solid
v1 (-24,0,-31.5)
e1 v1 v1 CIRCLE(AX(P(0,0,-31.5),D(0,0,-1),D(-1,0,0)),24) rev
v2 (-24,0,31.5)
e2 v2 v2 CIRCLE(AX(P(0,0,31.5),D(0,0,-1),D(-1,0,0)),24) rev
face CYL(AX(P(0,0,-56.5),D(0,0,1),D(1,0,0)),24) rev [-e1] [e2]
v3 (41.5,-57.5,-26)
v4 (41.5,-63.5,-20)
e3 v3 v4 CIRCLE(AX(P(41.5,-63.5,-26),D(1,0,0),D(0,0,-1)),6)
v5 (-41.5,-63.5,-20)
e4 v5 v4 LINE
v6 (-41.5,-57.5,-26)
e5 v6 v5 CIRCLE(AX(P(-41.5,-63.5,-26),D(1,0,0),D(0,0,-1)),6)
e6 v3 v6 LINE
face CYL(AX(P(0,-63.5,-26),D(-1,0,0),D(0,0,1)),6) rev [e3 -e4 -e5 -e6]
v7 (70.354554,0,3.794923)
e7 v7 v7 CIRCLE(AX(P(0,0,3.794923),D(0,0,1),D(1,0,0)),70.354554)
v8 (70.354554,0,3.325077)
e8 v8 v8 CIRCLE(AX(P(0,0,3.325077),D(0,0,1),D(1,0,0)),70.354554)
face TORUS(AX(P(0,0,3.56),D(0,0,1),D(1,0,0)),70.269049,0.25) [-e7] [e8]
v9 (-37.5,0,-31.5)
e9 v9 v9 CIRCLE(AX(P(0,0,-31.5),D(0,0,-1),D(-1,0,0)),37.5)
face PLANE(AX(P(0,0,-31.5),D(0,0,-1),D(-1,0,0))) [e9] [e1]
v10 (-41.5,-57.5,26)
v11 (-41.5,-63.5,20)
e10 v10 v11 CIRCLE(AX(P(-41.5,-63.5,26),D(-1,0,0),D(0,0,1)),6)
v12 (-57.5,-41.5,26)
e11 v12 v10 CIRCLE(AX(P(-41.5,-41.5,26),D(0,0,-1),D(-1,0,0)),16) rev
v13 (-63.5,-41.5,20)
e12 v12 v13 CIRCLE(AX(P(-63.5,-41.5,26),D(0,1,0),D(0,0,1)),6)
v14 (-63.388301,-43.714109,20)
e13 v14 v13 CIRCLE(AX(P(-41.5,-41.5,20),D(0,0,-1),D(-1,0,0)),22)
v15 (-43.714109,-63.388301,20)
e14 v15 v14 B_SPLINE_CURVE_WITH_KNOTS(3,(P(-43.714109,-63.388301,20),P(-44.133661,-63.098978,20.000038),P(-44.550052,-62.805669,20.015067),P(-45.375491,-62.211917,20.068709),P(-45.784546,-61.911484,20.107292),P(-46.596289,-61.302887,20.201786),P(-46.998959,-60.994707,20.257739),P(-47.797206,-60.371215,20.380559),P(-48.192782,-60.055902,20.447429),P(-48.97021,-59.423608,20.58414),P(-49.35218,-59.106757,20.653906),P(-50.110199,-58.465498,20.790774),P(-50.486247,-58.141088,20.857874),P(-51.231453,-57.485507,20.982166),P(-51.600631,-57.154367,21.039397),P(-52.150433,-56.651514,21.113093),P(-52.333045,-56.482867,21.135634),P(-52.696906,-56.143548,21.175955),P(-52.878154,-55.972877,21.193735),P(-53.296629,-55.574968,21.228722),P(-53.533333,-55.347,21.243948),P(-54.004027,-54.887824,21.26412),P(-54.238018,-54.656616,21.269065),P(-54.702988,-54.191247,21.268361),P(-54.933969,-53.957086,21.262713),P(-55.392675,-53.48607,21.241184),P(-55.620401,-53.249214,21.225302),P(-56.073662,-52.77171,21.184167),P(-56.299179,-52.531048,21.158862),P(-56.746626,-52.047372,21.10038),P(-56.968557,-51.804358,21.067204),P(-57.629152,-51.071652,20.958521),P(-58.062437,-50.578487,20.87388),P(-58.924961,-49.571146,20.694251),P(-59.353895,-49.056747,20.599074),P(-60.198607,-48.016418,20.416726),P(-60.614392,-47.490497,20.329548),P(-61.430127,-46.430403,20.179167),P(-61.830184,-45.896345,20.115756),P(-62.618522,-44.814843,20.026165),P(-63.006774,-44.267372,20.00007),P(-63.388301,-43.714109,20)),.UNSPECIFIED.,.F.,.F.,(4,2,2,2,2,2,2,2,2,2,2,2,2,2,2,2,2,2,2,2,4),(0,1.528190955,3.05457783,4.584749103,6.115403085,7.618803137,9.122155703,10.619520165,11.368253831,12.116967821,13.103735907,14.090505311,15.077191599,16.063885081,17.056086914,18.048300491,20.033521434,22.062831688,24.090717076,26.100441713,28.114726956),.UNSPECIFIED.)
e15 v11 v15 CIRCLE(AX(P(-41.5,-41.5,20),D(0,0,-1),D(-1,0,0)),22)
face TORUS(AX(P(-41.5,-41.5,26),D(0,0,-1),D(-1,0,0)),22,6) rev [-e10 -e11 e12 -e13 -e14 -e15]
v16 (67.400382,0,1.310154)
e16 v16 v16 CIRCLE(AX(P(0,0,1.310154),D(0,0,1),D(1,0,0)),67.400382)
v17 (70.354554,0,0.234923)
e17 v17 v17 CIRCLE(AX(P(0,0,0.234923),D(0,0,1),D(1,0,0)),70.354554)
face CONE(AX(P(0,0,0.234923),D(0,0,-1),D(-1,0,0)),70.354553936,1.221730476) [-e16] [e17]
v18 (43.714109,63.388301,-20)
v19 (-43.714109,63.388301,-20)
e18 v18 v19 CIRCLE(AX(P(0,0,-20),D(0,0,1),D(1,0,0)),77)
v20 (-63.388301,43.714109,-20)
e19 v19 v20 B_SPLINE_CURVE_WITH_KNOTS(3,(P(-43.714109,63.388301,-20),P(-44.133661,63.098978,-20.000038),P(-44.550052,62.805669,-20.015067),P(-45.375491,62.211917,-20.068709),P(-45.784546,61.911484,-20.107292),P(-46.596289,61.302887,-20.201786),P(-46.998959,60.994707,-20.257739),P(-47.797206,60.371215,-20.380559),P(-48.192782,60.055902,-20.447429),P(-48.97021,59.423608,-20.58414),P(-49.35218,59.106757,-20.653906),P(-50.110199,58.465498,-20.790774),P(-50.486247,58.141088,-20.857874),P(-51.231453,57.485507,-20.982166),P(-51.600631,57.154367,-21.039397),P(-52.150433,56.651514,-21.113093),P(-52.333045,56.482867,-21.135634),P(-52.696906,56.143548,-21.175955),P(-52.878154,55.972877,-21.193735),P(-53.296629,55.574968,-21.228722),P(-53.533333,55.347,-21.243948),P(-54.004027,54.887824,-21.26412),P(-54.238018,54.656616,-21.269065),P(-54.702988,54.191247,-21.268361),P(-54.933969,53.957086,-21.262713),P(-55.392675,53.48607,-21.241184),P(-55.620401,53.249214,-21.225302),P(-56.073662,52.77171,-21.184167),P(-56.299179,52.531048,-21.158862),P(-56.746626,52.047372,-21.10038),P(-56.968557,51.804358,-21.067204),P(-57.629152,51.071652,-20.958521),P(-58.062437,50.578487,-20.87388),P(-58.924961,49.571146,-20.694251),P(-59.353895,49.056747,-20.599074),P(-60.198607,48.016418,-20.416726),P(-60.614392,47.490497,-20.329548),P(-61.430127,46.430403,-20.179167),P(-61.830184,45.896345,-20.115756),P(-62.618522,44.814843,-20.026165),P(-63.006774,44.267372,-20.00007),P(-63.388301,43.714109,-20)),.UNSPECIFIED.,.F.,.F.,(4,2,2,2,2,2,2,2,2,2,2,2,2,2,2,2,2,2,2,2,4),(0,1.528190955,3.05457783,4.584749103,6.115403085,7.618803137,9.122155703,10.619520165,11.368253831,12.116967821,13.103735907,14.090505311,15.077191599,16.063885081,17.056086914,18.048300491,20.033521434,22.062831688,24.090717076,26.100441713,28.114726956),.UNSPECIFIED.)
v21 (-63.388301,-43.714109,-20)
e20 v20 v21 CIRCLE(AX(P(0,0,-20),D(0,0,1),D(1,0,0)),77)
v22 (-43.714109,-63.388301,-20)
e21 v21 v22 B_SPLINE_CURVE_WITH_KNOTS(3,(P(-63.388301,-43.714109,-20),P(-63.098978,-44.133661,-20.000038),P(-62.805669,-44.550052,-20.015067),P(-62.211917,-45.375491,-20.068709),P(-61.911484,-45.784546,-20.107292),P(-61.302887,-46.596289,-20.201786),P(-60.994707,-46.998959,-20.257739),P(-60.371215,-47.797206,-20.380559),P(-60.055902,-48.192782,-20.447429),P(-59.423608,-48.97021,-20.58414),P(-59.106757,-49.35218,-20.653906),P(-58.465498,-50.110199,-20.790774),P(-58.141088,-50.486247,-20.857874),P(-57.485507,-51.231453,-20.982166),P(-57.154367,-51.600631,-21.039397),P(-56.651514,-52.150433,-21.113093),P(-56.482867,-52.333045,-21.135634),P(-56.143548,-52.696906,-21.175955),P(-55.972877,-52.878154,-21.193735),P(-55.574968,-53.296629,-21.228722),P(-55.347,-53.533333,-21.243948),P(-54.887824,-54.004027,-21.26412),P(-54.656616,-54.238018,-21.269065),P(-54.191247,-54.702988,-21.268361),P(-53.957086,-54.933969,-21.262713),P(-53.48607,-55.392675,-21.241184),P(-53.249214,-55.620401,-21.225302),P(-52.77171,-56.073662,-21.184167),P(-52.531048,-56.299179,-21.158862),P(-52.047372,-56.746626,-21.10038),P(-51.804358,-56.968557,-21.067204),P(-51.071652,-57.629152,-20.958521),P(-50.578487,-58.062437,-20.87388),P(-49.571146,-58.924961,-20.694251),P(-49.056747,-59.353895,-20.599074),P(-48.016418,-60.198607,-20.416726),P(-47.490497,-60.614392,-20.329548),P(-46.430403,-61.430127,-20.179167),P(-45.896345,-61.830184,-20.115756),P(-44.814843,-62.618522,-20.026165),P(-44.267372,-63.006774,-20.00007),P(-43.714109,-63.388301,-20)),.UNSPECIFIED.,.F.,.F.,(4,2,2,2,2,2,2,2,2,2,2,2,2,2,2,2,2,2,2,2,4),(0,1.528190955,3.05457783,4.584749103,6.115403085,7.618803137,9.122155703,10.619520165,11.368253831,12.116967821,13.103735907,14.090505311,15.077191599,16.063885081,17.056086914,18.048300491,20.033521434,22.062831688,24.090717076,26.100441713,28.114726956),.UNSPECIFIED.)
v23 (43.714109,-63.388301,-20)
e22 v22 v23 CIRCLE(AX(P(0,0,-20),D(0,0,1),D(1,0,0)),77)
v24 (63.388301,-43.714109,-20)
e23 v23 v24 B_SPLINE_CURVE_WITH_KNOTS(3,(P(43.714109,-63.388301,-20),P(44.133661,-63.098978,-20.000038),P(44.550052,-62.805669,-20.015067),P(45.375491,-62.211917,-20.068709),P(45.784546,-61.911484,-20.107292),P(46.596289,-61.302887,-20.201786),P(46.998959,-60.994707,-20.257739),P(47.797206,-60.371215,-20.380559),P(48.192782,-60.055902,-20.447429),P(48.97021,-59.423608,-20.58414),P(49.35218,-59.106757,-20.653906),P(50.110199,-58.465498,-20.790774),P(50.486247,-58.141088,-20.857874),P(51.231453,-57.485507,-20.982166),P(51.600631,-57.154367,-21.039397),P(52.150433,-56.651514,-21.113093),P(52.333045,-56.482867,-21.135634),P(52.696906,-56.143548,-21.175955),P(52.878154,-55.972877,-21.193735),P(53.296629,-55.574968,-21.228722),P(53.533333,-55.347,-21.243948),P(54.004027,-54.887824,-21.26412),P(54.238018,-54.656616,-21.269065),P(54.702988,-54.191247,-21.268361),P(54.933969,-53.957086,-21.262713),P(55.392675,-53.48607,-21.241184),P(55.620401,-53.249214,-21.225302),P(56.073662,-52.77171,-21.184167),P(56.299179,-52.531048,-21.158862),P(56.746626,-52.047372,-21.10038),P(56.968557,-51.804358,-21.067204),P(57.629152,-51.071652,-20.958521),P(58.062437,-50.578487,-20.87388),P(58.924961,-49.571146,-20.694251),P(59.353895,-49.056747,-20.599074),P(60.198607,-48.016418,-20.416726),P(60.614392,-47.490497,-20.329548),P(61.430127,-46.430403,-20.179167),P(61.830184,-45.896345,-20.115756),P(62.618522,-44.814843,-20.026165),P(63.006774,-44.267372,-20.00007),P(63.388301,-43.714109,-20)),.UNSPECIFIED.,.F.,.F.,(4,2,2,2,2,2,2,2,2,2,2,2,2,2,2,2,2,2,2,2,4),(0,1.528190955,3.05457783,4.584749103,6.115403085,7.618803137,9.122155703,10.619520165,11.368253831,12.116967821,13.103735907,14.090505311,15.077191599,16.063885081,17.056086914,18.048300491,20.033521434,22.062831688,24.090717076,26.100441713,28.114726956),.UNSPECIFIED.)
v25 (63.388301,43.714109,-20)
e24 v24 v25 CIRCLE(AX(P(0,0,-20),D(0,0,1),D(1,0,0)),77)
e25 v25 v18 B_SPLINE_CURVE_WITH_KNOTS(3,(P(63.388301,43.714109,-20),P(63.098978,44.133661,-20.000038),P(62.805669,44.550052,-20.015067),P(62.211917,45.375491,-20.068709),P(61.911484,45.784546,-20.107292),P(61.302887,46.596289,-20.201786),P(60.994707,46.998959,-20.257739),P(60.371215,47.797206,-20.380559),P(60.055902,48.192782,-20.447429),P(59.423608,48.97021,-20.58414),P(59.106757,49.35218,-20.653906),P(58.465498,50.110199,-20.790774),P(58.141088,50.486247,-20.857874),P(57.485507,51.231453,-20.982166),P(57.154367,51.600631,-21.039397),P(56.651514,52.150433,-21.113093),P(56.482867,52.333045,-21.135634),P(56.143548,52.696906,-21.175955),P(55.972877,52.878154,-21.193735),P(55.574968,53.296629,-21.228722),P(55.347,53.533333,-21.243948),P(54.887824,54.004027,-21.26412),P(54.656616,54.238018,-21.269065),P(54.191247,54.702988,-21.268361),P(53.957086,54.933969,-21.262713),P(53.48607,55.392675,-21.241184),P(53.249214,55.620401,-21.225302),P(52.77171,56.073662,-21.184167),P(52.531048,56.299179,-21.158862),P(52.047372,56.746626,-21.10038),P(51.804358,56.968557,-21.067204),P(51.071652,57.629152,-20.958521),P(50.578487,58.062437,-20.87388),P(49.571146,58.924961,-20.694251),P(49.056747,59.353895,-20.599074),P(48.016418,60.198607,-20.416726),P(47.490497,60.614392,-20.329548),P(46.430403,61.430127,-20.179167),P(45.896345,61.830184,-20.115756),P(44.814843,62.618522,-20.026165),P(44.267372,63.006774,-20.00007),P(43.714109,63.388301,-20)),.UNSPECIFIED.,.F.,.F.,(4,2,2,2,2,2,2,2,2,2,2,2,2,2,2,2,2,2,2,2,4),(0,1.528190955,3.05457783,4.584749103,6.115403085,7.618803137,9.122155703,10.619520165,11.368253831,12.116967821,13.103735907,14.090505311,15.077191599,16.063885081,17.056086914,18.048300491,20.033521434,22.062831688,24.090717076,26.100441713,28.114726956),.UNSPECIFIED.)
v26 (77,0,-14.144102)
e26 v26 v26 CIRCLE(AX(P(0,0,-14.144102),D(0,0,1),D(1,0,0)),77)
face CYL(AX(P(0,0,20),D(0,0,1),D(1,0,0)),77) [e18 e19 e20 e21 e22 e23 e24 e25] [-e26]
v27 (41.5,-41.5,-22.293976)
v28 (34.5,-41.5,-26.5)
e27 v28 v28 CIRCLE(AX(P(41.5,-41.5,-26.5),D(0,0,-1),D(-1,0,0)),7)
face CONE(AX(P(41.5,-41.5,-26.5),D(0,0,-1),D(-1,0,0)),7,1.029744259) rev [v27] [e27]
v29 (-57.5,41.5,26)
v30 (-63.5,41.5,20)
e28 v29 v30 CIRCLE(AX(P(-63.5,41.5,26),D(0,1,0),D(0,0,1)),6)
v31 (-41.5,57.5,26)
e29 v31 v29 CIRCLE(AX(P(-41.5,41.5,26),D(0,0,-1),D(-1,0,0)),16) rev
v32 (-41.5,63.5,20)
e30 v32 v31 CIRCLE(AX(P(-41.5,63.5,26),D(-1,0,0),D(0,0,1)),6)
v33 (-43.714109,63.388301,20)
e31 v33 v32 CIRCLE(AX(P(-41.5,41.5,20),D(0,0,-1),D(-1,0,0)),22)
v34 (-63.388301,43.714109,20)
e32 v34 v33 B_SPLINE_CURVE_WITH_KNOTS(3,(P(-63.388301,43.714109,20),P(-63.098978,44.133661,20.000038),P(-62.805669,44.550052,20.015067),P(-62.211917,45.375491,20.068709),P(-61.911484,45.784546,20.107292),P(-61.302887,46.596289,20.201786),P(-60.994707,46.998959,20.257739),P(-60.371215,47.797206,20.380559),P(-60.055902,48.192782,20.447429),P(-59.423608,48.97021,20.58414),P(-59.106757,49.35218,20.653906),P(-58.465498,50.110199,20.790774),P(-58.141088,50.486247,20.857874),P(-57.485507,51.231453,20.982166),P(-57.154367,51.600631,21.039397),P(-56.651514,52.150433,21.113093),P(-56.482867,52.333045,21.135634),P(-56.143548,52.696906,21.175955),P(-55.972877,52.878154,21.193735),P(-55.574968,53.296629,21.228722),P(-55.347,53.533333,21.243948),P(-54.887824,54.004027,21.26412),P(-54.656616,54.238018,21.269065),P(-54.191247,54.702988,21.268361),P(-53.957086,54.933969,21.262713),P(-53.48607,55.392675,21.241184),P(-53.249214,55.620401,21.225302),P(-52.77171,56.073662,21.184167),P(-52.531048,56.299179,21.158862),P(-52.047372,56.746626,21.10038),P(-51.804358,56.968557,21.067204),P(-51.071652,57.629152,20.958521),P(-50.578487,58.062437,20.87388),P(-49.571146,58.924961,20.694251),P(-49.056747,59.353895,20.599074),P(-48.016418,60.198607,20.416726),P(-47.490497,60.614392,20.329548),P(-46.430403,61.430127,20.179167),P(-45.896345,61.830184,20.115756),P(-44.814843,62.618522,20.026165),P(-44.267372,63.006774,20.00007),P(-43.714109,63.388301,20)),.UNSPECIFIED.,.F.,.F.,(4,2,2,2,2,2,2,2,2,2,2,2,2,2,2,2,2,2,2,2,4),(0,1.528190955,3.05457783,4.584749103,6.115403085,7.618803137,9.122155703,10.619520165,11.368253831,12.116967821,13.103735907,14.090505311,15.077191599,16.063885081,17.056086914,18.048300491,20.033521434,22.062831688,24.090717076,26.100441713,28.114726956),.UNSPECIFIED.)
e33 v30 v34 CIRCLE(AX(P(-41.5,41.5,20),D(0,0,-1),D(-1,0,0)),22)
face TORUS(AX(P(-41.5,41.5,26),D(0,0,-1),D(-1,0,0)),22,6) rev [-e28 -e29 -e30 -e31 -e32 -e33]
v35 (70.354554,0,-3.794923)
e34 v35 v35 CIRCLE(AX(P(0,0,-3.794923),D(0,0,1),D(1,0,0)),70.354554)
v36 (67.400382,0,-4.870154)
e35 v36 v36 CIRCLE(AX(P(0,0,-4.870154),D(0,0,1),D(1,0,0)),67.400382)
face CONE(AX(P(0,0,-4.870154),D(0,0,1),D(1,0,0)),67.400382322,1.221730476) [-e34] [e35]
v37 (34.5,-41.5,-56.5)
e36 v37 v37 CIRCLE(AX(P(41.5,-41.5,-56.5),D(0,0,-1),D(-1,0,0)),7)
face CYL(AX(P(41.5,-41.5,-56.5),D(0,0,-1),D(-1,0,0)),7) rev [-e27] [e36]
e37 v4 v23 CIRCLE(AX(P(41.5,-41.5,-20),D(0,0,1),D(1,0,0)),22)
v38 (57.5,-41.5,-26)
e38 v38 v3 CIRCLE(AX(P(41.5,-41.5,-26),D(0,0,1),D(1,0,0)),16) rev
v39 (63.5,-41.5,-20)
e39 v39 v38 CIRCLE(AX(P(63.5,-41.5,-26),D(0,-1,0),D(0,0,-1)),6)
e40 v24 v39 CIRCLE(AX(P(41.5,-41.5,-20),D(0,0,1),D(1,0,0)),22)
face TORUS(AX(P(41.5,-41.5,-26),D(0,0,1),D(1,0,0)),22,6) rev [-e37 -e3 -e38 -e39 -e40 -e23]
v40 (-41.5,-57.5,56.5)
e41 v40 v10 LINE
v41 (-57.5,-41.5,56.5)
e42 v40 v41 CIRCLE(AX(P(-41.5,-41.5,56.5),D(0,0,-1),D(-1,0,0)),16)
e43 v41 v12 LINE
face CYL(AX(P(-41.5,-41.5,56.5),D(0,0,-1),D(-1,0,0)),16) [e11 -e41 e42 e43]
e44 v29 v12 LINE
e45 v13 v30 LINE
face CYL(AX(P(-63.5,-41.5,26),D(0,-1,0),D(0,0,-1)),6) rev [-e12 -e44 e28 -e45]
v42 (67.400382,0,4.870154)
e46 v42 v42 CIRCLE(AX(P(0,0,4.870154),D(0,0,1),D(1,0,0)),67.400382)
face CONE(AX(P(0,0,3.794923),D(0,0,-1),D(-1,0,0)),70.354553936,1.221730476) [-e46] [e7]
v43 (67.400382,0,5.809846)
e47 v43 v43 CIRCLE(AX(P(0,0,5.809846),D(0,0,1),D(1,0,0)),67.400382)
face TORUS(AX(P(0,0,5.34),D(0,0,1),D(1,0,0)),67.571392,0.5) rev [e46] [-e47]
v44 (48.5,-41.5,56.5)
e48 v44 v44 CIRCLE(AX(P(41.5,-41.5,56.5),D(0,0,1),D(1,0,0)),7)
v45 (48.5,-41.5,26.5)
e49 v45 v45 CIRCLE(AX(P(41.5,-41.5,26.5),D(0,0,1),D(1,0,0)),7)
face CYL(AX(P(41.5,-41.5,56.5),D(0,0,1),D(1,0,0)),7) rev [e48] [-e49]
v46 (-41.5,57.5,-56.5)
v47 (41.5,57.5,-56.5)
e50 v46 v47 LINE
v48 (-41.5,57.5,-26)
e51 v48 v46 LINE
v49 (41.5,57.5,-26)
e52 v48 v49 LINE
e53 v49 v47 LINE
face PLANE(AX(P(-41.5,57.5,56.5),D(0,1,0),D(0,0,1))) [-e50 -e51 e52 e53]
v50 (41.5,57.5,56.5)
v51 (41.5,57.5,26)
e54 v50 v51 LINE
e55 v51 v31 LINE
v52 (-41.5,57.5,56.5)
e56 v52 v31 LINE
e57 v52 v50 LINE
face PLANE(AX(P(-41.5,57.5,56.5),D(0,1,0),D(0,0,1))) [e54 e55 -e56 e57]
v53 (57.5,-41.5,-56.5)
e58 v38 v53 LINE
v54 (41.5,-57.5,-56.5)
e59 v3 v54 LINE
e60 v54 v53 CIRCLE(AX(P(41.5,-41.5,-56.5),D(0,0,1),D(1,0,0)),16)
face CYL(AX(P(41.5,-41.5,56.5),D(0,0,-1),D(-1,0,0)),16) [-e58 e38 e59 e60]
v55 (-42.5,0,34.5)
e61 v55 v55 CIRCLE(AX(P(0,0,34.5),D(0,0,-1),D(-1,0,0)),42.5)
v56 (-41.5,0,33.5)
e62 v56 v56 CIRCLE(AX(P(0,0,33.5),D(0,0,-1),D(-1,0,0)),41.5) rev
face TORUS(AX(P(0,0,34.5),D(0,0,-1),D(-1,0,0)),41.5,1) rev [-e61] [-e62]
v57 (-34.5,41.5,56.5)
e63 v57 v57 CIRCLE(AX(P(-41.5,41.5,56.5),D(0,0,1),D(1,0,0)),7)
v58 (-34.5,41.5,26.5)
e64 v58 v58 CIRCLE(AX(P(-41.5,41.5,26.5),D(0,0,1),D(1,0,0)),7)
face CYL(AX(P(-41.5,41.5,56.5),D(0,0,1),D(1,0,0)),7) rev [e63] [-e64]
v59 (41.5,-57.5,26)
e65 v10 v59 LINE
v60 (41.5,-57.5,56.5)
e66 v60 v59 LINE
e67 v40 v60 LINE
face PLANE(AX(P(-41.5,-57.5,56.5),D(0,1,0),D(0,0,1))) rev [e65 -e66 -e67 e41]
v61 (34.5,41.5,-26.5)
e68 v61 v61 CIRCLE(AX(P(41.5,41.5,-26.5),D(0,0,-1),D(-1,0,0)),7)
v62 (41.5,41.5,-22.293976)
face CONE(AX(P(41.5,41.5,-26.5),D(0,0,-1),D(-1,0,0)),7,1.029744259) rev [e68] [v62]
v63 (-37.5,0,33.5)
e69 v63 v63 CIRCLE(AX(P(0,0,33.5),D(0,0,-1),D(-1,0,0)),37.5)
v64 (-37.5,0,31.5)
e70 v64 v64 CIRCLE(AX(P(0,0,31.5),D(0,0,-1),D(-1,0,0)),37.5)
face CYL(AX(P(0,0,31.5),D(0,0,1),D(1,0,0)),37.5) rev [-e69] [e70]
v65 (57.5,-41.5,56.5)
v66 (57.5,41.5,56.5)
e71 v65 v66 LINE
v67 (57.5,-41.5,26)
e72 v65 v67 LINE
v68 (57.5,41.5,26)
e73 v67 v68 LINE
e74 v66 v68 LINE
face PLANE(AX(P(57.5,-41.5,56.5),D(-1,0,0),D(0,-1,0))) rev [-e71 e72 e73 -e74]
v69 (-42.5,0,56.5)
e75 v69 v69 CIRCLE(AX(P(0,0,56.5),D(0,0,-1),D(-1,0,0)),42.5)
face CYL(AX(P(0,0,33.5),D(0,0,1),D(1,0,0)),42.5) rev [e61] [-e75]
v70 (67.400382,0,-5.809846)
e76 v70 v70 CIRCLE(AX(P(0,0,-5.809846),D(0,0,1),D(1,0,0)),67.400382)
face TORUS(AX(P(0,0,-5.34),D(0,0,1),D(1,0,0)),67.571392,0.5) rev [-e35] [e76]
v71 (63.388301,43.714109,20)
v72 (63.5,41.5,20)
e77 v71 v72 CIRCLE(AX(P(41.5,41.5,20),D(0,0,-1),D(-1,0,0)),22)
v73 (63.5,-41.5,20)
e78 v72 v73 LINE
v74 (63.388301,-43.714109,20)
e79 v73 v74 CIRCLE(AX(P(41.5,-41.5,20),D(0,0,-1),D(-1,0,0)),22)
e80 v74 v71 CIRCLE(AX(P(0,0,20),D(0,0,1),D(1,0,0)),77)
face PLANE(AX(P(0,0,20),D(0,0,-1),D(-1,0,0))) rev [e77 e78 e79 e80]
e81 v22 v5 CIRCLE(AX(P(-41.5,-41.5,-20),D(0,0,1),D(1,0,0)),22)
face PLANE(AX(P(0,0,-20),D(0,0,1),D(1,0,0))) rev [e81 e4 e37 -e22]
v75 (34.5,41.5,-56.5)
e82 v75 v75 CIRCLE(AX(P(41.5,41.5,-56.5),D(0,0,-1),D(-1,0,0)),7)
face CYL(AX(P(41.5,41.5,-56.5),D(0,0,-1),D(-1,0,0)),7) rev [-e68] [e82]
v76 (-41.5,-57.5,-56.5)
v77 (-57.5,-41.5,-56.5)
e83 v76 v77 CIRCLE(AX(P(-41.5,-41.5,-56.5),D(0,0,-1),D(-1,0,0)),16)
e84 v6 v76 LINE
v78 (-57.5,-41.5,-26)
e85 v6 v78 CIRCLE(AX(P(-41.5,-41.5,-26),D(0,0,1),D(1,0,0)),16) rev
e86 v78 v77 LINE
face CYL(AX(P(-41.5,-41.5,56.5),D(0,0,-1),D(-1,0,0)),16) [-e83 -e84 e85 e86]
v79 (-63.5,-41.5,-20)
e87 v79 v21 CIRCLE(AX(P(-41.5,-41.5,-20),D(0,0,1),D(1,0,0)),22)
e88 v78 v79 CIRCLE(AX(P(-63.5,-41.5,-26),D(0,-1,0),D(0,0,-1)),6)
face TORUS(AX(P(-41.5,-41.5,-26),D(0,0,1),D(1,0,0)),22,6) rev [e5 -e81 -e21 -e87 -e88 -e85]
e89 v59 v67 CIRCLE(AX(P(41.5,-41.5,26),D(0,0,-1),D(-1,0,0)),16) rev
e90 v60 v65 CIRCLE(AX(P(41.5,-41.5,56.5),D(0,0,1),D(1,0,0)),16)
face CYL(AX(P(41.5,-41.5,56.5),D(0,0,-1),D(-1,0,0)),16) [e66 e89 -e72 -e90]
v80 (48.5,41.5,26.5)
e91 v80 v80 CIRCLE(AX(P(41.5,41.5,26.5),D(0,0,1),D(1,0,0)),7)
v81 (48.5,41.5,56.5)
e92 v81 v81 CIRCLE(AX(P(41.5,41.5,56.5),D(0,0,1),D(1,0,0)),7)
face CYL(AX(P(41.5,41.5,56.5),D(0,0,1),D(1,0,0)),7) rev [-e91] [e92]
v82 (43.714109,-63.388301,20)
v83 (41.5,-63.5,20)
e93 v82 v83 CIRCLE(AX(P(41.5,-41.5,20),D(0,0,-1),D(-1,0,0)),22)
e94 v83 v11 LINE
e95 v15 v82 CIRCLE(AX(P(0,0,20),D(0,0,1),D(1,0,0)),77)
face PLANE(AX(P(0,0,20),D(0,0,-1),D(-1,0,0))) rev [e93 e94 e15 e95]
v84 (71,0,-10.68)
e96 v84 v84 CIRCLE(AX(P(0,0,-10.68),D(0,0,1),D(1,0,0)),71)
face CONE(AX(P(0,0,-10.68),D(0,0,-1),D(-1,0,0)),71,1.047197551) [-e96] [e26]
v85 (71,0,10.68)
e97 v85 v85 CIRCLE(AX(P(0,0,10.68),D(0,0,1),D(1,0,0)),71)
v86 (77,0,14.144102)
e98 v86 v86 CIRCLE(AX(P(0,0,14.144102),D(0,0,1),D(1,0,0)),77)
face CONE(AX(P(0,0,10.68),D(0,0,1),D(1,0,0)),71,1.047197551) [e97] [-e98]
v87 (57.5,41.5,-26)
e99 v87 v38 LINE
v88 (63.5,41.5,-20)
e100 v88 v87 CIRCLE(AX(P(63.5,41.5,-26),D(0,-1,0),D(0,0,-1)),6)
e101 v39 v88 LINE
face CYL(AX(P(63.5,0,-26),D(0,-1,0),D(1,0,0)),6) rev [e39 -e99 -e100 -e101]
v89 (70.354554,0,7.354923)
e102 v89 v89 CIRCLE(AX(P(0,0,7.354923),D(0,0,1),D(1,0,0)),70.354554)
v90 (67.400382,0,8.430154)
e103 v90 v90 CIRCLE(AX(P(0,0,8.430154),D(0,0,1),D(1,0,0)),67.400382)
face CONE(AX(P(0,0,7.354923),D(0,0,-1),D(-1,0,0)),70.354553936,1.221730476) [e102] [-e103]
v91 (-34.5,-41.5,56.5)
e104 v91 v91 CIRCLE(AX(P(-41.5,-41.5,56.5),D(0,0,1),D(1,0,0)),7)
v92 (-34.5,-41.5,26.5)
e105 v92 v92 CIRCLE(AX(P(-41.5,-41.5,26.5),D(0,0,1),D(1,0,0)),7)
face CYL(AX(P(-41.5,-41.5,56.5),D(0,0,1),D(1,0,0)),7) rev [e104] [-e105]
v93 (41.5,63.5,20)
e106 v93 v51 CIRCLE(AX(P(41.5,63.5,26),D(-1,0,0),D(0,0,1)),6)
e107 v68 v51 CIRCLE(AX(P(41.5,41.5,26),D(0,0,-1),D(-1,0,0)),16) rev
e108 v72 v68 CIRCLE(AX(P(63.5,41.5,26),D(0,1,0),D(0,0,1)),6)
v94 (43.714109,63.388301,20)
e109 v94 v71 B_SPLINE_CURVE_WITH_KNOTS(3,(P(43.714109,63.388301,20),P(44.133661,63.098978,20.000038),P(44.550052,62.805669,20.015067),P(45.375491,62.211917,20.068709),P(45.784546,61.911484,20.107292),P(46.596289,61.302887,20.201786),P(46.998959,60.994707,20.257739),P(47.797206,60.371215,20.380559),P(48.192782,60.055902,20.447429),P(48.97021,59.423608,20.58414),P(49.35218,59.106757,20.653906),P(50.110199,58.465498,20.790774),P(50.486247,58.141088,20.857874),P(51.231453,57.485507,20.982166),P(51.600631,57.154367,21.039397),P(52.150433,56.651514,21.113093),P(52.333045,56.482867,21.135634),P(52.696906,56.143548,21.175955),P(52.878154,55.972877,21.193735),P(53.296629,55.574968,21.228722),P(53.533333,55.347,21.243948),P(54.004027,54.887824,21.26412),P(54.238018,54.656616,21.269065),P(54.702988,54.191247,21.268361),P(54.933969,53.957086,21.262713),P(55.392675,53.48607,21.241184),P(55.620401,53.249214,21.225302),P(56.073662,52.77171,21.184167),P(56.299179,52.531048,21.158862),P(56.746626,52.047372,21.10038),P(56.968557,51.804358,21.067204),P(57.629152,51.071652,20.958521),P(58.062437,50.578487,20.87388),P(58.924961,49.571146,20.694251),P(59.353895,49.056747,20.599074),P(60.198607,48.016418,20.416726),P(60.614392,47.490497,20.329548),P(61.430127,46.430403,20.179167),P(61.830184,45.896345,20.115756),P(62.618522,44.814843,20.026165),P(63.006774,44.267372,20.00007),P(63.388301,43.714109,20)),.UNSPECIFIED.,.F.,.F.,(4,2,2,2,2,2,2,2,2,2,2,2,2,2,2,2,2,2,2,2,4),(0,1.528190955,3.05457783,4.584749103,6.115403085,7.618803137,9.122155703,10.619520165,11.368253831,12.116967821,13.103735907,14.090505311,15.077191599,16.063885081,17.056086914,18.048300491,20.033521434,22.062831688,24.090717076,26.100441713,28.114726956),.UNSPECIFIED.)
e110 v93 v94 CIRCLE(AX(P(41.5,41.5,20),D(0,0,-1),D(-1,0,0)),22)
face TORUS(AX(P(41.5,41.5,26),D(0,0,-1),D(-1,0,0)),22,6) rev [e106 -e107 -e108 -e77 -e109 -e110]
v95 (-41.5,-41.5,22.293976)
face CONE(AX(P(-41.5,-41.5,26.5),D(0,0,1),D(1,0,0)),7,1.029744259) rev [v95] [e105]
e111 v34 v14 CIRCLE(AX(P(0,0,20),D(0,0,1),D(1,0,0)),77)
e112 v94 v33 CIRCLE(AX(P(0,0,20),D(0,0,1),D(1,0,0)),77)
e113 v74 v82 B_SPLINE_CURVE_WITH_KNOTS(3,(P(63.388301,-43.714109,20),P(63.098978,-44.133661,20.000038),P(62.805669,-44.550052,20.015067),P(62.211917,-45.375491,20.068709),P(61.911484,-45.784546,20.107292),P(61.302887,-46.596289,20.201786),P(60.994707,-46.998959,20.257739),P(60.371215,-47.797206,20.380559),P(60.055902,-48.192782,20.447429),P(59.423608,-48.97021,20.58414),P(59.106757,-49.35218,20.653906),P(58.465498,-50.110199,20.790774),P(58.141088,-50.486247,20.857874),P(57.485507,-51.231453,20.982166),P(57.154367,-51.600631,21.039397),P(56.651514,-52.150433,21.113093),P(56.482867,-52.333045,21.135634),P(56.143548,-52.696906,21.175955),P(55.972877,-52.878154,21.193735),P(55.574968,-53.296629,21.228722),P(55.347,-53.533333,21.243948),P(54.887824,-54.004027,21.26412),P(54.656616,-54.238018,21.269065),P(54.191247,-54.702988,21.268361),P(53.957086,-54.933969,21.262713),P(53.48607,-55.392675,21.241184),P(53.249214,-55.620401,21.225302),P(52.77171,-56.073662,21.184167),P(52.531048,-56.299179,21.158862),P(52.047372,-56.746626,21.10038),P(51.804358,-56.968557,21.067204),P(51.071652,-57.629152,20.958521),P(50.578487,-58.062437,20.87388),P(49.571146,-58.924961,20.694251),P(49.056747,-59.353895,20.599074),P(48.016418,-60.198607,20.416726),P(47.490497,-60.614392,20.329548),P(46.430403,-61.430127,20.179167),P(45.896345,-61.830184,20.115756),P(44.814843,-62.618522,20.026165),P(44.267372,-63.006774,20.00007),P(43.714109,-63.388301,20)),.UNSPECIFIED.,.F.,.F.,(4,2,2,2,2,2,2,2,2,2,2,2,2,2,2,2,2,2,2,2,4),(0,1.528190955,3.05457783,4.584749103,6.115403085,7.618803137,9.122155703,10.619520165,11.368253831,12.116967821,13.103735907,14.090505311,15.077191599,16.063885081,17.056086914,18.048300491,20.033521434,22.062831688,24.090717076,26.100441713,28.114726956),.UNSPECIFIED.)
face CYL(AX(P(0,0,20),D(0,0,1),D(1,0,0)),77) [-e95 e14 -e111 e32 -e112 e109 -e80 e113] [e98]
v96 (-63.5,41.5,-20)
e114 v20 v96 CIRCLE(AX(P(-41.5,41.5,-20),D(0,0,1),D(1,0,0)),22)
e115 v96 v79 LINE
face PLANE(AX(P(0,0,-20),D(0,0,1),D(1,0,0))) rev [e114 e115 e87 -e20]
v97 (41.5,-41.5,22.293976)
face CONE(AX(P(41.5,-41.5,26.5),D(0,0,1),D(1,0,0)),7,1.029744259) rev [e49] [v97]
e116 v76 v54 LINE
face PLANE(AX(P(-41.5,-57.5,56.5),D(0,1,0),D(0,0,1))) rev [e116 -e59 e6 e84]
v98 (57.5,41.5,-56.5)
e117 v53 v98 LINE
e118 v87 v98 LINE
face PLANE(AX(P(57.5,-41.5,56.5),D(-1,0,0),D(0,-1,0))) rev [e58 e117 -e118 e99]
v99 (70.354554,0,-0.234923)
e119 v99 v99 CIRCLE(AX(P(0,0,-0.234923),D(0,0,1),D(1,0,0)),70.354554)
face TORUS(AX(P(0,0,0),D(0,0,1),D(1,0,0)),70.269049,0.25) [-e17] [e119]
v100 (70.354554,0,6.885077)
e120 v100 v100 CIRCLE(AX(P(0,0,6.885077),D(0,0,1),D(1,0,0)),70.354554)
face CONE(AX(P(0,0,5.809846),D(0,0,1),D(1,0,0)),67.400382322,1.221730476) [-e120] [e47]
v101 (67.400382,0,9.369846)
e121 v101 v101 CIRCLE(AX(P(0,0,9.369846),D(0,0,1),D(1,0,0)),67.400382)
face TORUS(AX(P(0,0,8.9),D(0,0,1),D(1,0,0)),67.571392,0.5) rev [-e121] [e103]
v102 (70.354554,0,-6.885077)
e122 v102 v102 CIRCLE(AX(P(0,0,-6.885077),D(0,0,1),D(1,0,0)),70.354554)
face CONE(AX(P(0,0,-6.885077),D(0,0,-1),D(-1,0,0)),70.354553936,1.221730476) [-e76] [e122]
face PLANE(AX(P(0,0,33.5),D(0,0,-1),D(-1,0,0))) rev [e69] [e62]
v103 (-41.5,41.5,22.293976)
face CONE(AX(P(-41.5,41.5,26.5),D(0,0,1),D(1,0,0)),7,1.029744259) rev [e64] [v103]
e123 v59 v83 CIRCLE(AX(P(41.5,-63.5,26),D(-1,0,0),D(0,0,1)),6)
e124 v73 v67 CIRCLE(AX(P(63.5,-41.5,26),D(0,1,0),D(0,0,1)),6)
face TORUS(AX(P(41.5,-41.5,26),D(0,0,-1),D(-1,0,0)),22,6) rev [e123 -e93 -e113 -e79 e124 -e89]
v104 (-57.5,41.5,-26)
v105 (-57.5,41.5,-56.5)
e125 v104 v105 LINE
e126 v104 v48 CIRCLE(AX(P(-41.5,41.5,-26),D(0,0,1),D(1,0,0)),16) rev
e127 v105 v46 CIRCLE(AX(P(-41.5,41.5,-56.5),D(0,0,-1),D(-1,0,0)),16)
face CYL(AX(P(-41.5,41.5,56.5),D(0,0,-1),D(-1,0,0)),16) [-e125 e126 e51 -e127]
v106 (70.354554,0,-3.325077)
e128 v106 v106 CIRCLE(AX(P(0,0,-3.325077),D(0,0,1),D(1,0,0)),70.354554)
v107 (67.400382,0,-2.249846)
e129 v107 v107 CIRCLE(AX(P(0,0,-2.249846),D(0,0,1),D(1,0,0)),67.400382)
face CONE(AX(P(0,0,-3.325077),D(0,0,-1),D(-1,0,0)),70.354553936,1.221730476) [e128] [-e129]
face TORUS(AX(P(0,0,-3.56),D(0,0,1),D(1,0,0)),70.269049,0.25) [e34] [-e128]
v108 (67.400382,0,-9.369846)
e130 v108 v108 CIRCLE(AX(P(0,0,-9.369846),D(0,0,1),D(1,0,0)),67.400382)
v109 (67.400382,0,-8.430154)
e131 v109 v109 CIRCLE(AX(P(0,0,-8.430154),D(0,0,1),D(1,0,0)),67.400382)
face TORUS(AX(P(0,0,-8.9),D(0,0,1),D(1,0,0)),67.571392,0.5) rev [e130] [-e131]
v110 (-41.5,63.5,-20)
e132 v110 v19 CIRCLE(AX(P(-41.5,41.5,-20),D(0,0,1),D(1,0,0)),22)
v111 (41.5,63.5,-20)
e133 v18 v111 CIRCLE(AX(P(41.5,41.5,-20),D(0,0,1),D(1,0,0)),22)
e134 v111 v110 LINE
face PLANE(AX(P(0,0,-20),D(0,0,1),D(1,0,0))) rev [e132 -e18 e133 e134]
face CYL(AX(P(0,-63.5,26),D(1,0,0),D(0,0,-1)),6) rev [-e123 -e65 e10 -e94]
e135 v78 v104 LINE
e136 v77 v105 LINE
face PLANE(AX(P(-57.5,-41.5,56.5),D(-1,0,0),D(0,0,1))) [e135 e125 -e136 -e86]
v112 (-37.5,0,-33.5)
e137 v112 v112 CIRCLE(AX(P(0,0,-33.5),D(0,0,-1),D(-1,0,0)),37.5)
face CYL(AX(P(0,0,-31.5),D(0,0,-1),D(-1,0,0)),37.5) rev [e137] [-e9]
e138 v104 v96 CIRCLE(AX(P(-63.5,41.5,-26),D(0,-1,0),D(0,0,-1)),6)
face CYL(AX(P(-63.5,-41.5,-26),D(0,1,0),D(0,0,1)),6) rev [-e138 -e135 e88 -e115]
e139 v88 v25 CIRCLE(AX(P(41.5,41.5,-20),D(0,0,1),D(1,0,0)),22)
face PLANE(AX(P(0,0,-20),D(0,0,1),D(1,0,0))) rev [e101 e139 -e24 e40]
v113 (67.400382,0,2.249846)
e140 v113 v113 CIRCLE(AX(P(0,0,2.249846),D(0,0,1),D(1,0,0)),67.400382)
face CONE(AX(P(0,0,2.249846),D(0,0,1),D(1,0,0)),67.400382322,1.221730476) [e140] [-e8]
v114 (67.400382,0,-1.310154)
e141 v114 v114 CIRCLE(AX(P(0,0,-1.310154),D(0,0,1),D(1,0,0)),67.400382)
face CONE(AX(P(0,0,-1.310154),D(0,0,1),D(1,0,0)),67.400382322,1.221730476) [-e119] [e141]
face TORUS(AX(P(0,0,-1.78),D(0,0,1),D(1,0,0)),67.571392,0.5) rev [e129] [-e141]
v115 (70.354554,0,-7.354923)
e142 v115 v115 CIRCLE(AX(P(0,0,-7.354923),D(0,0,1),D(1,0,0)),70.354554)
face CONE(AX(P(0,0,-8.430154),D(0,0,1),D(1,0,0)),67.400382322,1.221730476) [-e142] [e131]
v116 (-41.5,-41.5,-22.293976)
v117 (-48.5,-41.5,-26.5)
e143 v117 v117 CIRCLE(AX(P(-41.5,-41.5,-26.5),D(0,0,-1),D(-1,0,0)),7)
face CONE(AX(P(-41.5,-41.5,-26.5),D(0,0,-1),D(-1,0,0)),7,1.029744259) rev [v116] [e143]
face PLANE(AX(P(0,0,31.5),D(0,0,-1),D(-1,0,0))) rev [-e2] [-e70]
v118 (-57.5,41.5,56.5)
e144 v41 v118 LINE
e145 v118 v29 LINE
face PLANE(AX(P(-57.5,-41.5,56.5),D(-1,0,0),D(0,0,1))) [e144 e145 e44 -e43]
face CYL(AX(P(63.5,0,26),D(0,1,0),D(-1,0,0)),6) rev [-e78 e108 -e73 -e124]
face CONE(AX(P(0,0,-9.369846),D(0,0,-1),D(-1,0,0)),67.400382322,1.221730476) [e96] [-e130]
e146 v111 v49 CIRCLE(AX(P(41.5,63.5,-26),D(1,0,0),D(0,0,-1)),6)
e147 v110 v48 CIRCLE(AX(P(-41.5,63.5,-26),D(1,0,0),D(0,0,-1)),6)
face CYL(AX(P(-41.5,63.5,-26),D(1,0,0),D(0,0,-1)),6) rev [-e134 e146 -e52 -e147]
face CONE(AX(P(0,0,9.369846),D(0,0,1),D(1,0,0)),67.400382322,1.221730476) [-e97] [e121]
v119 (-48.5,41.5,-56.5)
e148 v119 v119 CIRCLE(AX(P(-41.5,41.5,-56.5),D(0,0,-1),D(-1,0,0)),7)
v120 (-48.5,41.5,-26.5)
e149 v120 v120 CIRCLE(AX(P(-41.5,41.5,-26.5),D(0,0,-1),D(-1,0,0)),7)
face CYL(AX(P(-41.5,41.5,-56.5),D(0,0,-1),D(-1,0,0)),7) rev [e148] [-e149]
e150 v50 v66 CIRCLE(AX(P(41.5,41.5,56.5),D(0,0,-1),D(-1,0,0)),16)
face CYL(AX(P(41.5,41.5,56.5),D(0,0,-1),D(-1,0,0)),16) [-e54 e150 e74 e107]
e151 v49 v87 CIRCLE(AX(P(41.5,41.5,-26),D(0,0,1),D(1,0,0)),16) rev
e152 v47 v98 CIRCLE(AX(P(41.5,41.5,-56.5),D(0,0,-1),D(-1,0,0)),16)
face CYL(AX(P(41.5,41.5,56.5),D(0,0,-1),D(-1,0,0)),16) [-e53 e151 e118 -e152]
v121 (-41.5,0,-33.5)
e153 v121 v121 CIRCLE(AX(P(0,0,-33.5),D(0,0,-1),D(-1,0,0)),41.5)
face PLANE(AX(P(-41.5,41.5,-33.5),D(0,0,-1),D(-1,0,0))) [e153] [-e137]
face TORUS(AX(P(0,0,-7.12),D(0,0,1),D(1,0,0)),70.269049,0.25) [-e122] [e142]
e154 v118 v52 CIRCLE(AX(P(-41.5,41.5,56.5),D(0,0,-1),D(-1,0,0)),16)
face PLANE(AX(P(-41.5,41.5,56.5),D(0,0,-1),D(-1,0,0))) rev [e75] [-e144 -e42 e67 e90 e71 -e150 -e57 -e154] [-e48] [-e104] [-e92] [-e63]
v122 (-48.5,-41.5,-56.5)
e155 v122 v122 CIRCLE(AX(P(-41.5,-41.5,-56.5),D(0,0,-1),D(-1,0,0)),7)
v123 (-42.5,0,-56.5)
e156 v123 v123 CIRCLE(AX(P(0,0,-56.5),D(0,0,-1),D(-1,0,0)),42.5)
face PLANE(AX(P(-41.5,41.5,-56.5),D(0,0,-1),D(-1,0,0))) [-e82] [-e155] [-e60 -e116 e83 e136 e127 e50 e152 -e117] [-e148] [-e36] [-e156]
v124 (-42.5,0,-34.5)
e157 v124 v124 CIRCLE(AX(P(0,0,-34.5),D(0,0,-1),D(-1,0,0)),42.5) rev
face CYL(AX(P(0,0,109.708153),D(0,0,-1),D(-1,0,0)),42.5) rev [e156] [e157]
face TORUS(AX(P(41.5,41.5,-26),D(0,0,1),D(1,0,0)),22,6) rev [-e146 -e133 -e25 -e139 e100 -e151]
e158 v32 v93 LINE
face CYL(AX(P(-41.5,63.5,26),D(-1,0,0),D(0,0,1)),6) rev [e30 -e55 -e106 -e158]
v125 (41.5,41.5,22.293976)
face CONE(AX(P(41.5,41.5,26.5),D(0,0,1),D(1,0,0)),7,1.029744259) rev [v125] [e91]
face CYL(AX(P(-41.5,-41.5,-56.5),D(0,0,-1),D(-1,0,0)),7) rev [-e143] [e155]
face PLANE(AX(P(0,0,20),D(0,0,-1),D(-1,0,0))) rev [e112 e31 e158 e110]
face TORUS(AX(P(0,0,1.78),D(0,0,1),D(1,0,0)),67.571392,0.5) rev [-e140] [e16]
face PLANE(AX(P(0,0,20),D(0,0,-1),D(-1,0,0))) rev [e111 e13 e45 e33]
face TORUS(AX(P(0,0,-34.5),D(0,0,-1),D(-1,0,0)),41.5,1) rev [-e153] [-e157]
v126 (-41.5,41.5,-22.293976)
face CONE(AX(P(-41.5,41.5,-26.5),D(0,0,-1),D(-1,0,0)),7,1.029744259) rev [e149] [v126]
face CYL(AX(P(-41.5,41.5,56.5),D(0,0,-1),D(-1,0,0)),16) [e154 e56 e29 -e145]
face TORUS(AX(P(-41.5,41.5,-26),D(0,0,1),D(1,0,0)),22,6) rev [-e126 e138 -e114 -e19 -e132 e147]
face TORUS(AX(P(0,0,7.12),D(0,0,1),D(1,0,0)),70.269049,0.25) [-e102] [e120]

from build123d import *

# Parameters (mm, degrees)
EXTRUS_O_QUADRADO_DEPTH       = 56.5
FURO_EIXO_PASSANTE_DEPTH      = 123.6794605090844
FURO_EIXO_PASSANTE_DEPTH_BACK = 123.6794605090844
ESBO_O4_5_R                   = 24
REBAIXO_START                 = -56.5
ESBO_O4_R                     = 42.5
REBAIXO_ROLAMENTO_1_DEPTH     = 23
REBAIXO_START_2               = 33.5
ESBO_O4_4_R                   = 42.5
REBAIXO_ROLAMENTO_2_DEPTH     = 23
CORTE_EXTRUS_O4_START         = 33.5
ESBO_O4_6_R                   = 37.50000000000001
CORTE_EXTRUS_O4_DEPTH         = 2
CORTE_EXTRUS_O5_START         = -31.5
ESBO_O4_7_R                   = 37.50000000000001
CORTE_EXTRUS_O5_DEPTH         = 2
FUROS_FIXA_O_1_D              = 14
FUROS_FIXA_O_1_DEPTH          = 30
FUROS_FIXA_O_1_TIP            = 4.206024333192922
FUROS_FIXA_O_2_D              = 14
FUROS_FIXA_O_2_DEPTH          = 30
FUROS_FIXA_O_2_TIP            = 4.206024333192922
FILETE_AL_VIO_R               = 6
FILETE4_R                     = 1


# Read off the part's stored shape, not the designer's step: CORTE REVOLUÇÃO POLIA
with BuildPart() as part:
    # Esboço2 → EXTRUSÃO QUADRADO (new, symmetric)
    with BuildSketch(Plane.XY):
        with BuildLine():
            Line((-41.49999999999999, -57.5), (41.50000000000001, -57.5))
            ThreePointArc((41.50000000000001, -57.5), (52.81370849898477, -52.81370849898476), (57.5, -41.5))
            Line((57.5, -41.5), (57.50000000000001, 41.500000000000014))
            ThreePointArc((57.50000000000001, 41.500000000000014), (52.813708498984774, 52.81370849898478), (41.50000000000001, 57.500000000000014))
            Line((41.50000000000001, 57.500000000000014), (-41.49999999999999, 57.500000000000014))
            ThreePointArc((-41.49999999999999, 57.500000000000014), (-52.81370849898475, 52.813708498984774), (-57.49999999999999, 41.500000000000014))
            Line((-57.49999999999999, 41.500000000000014), (-57.49999999999999, -41.5))
            ThreePointArc((-57.49999999999999, -41.5), (-52.81370849898475, -52.81370849898476), (-41.49999999999999, -57.5))
        make_face()
    extrude(amount=EXTRUS_O_QUADRADO_DEPTH, both=True)

    # Esboço3 → REVOLUÇÃO POLIA (revolve)
    with BuildSketch(Plane(origin=(0, 0, 0), x_dir=(0, 0, -1), z_dir=(1, 0, 0)), mode=Mode.PRIVATE) as revolu_o_polia_sk:
        with BuildLine():
            Line((-7.354923155196484, 70.35455393579063), (-8.430153689607168, 67.40038232178915))
            ThreePointArc((-8.430153689607168, 67.40038232178915), (-8.900000000000023, 67.07139239345206), (-9.369846310392886, 67.40038232178915))
            Line((-9.369846310392886, 67.40038232178915), (-10.679999999999998, 71))
            Line((-10.679999999999998, 71), (-14.144101615137766, 77))
            Line((-14.144101615137766, 77), (-20.000000000000004, 77))
            Line((-20.000000000000004, 77), (-20, 0))
            Line((-20, 0), (20, 0))
            Line((20, 0), (20.000000000000004, 77))
            Line((20.000000000000004, 77), (14.144101615137759, 77))
            Line((14.144101615137759, 77), (10.679999999999998, 71))
            Line((10.679999999999998, 71), (9.369846310392832, 67.40038232178915))
            ThreePointArc((9.369846310392832, 67.40038232178915), (8.89999999999998, 67.07139239345206), (8.43015368960713, 67.40038232178915))
            Line((8.43015368960713, 67.40038232178915), (7.354923155196457, 70.35455393579065))
            ThreePointArc((7.354923155196457, 70.35455393579065), (7.119999999999998, 70.51904889995923), (6.885076844803523, 70.35455393579066))
            Line((6.885076844803523, 70.35455393579066), (5.809846310392832, 67.40038232178917))
            ThreePointArc((5.809846310392832, 67.40038232178917), (5.339999999999984, 67.07139239345206), (4.8701536896071085, 67.40038232178915))
            Line((4.8701536896071085, 67.40038232178915), (3.7949231551964493, 70.35455393579062))
            ThreePointArc((3.7949231551964493, 70.35455393579062), (3.559999999999979, 70.51904889995919), (3.325076844803502, 70.35455393579062))
            Line((3.325076844803502, 70.35455393579062), (2.249846310392827, 67.40038232178917))
            ThreePointArc((2.249846310392827, 67.40038232178917), (1.7799999999999798, 67.07139239345207), (1.310153689607125, 67.40038232178917))
            Line((1.310153689607125, 67.40038232178917), (0.23492315519646462, 70.35455393579063))
            ThreePointArc((0.23492315519646462, 70.35455393579063), (3.83e-15, 70.51904889995922), (-0.23492315519647558, 70.35455393579065))
            Line((-0.23492315519647558, 70.35455393579065), (-1.3101536896071617, 67.40038232178917))
            ThreePointArc((-1.3101536896071617, 67.40038232178917), (-1.7800000000000142, 67.07139239345206), (-2.2498463103928654, 67.40038232178917))
            Line((-2.2498463103928654, 67.40038232178917), (-3.325076844803528, 70.35455393579063))
            ThreePointArc((-3.325076844803528, 70.35455393579063), (-3.560000000000005, 70.51904889995922), (-3.7949231551964853, 70.35455393579063))
            Line((-3.7949231551964853, 70.35455393579063), (-4.870153689607166, 67.40038232178915))
            ThreePointArc((-4.870153689607166, 67.40038232178915), (-5.340000000000018, 67.07139239345206), (-5.809846310392879, 67.40038232178915))
            Line((-5.809846310392879, 67.40038232178915), (-6.885076844803537, 70.35455393579062))
            ThreePointArc((-6.885076844803537, 70.35455393579062), (-7.12, 70.5190488999592), (-7.354923155196484, 70.35455393579063))
        make_face()
    revolve(revolu_o_polia_sk.sketch.rotate(Axis((0, 0, 20), (0, 0, -1)), 90), axis=Axis((0, 0, 20), (0, 0, -1)))

    # CORTE REVOLUÇÃO POLIA outline → CORTE REVOLUÇÃO POLIA (revolve, cut)
    with BuildSketch(Plane.XZ):
        with BuildLine():
            Line((77, 14.144101615), (71, 10.68))
            Line((71, 10.68), (67.400382322, 9.36984631))
            ThreePointArc((67.400382322, 9.36984631), (67.071392393, 8.9), (67.400382322, 8.43015369))
            Line((67.400382322, 8.43015369), (70.354553936, 7.354923155))
            ThreePointArc((70.354553936, 7.354923155), (70.5190489, 7.12), (70.354553936, 6.885076845))
            Line((70.354553936, 6.885076845), (67.400382322, 5.80984631))
            ThreePointArc((67.400382322, 5.80984631), (67.071392393, 5.34), (67.400382322, 4.87015369))
            Line((67.400382322, 4.87015369), (70.354553936, 3.794923155))
            ThreePointArc((70.354553936, 3.794923155), (70.5190489, 3.56), (70.354553936, 3.325076845))
            Line((70.354553936, 3.325076845), (67.400382322, 2.24984631))
            ThreePointArc((67.400382322, 2.24984631), (67.071392393, 1.78), (67.400382322, 1.31015369))
            Line((67.400382322, 1.31015369), (70.354553936, 0.234923155))
            ThreePointArc((70.354553936, 0.234923155), (70.5190489, 0), (70.354553936, -0.234923155))
            Line((70.354553936, -0.234923155), (67.400382322, -1.31015369))
            ThreePointArc((67.400382322, -1.31015369), (67.071392393, -1.78), (67.400382322, -2.24984631))
            Line((67.400382322, -2.24984631), (70.354553936, -3.325076845))
            ThreePointArc((70.354553936, -3.325076845), (70.5190489, -3.56), (70.354553936, -3.794923155))
            Line((70.354553936, -3.794923155), (67.400382322, -4.87015369))
            ThreePointArc((67.400382322, -4.87015369), (67.071392393, -5.34), (67.400382322, -5.80984631))
            Line((67.400382322, -5.80984631), (70.354553936, -6.885076845))
            ThreePointArc((70.354553936, -6.885076845), (70.5190489, -7.12), (70.354553936, -7.354923155))
            Line((70.354553936, -7.354923155), (67.400382322, -8.43015369))
            ThreePointArc((67.400382322, -8.43015369), (67.071392393, -8.9), (67.400382322, -9.36984631))
            Line((67.400382322, -9.36984631), (71, -10.68))
            Line((71, -10.68), (77, -14.144101615))
            Line((77, -14.144101615), (77, 14.144101615))
        make_face()
    revolve(axis=Axis((0, 0, 0), (0, 0, 1)), mode=Mode.SUBTRACT)

    # Esboço4<5> → FURO EIXO PASSANTE (cut, two sides: drawn at the far end of the back side and taken through both)
    with BuildSketch(Plane.XY.offset(-FURO_EIXO_PASSANTE_DEPTH_BACK)):
        Circle(ESBO_O4_5_R)
    extrude(amount=FURO_EIXO_PASSANTE_DEPTH + FURO_EIXO_PASSANTE_DEPTH_BACK, mode=Mode.SUBTRACT)

    # Esboço4 → REBAIXO ROLAMENTO 1 (cut)
    with BuildSketch(Plane.XY.offset(REBAIXO_START)):
        with Locations(Location((0, 0, 0), (0, 0, 180))):
            Circle(ESBO_O4_R)
    extrude(amount=REBAIXO_ROLAMENTO_1_DEPTH, mode=Mode.SUBTRACT)

    # Esboço4<4> → REBAIXO ROLAMENTO 2 (cut)
    with BuildSketch(Plane.XY.offset(REBAIXO_START_2)):
        with Locations(Location((0, 0, 0), (0, 0, 180))):
            Circle(ESBO_O4_4_R)
    extrude(amount=REBAIXO_ROLAMENTO_2_DEPTH, mode=Mode.SUBTRACT)

    # Esboço4<6> → Corte-extrusão4 (cut)
    with BuildSketch(Plane.XY.offset(CORTE_EXTRUS_O4_START)):
        with Locations(Location((0, 0, 0), (0, 0, 180))):
            Circle(ESBO_O4_6_R)
    extrude(amount=-CORTE_EXTRUS_O4_DEPTH, mode=Mode.SUBTRACT)

    # Esboço4<7> → Corte-extrusão5 (cut)
    with BuildSketch(Plane.XY.offset(CORTE_EXTRUS_O5_START)):
        with Locations(Location((0, 0, 0), (0, 0, 180))):
            Circle(ESBO_O4_7_R)
    extrude(amount=-CORTE_EXTRUS_O5_DEPTH, mode=Mode.SUBTRACT)

    # FUROS FIXAÇÃO 1
    with Locations(Plane(origin=(0, 0, -56.5), x_dir=(-1, 0, 0), z_dir=(0, 0, -1))):
        with Locations((41.5, 41.5), (-41.5, -41.5), (-41.5, 41.5), (41.5, -41.5)):
            Hole(FUROS_FIXA_O_1_D / 2, depth=FUROS_FIXA_O_1_DEPTH)
            with Locations((0, 0, -(FUROS_FIXA_O_1_DEPTH + FUROS_FIXA_O_1_TIP / 2))):  # 118° drill point
                Cone(0, FUROS_FIXA_O_1_D / 2, FUROS_FIXA_O_1_TIP, mode=Mode.SUBTRACT)

    # FUROS FIXAÇÃO 2
    with Locations(Plane.XY.offset(56.5)):
        with Locations((-41.5, 41.5), (41.5, 41.5), (41.5, -41.5), (-41.5, -41.5)):
            Hole(FUROS_FIXA_O_2_D / 2, depth=FUROS_FIXA_O_2_DEPTH)
            with Locations((0, 0, -(FUROS_FIXA_O_2_DEPTH + FUROS_FIXA_O_2_TIP / 2))):  # 118° drill point
                Cone(0, FUROS_FIXA_O_2_D / 2, FUROS_FIXA_O_2_TIP, mode=Mode.SUBTRACT)

    # FILETE ALÍVIO
    # the kernel refuses this fillet: 6 mm, written as the material it adds along each edge
    with BuildSketch(Plane(origin=(-41.499999999999986, 41.500000000000014, 20.000000000000004), x_dir=(-4.4e-16, 1, 0), z_dir=(1, 4.4e-16, 0))) as filete_al_vio_piece_1_section:
        with BuildLine():
            CenterArc((16 + FILETE_AL_VIO_R, FILETE_AL_VIO_R), FILETE_AL_VIO_R, 180, 90)
            Line((16 + FILETE_AL_VIO_R, 0), (16, 0))
            Line((16, 0), (16, FILETE_AL_VIO_R))
        make_face()
    filete_al_vio_piece_1 = revolve(axis=Axis((-41.499999999999986, 41.500000000000014, 20.000000000000004), (0, 0, 1)), revolution_arc=89.99999999999997, mode=Mode.PRIVATE)
    filete_al_vio_piece_1 = filete_al_vio_piece_1 & Plane(origin=(0, 0, 21.714468670196165), x_dir=(1, 1.1e-16, 0), z_dir=(0, 0, 1)) * Cylinder(77, 88, mode=Mode.PRIVATE)
    add(filete_al_vio_piece_1)
    with BuildSketch(Plane(origin=(-57.49999999999999, 41.500000000000014, 20.000000000000004), x_dir=(0, 0, 1), z_dir=(0, -1, 0)), Plane(origin=(-57.49999999999999, -41.5, -20), x_dir=(0, 0, -1), z_dir=(0, 1, 0)), Plane(origin=(57.5, -41.5, 20.000000000000004), x_dir=(0, 0, 1), z_dir=(9e-17, 1, 0))) as filete_al_vio_piece_2:
        with BuildLine():
            CenterArc((FILETE_AL_VIO_R, FILETE_AL_VIO_R), FILETE_AL_VIO_R, 180, 90)
            Line((0, FILETE_AL_VIO_R), (0, 0))
            Line((0, 0), (FILETE_AL_VIO_R, 0))
        make_face()
    extrude(amount=83.00000000000001)
    with BuildSketch(Plane(origin=(-41.499999999999986, -41.5, 20.000000000000004), x_dir=(-1, 0, 0), z_dir=(0, 1, 0))) as filete_al_vio_piece_3_section:
        with BuildLine():
            CenterArc((16 + FILETE_AL_VIO_R, FILETE_AL_VIO_R), FILETE_AL_VIO_R, 180, 90)
            Line((16 + FILETE_AL_VIO_R, 0), (16, 0))
            Line((16, 0), (16, FILETE_AL_VIO_R))
        make_face()
    filete_al_vio_piece_3 = revolve(axis=Axis((-41.499999999999986, -41.5, 20.000000000000004), (0, 0, 1)), revolution_arc=89.99999999999997, mode=Mode.PRIVATE)
    filete_al_vio_piece_3 = filete_al_vio_piece_3 & Plane(origin=(0, 0, 21.714468670196165), x_dir=(1, 1.1e-16, 0), z_dir=(0, 0, 1)) * Cylinder(77, 88, mode=Mode.PRIVATE)
    add(filete_al_vio_piece_3)
    with BuildSketch(Plane(origin=(41.50000000000003, 41.500000000000036, 20.000000000000004), x_dir=(1, -1.33e-15, 0), z_dir=(-1.33e-15, -1, 0))) as filete_al_vio_piece_4_section:
        with BuildLine():
            CenterArc((15.999999999999979 + FILETE_AL_VIO_R, FILETE_AL_VIO_R), FILETE_AL_VIO_R, 180, 90)
            Line((15.999999999999979 + FILETE_AL_VIO_R, 0), (15.999999999999979, 0))
            Line((15.999999999999979, 0), (15.999999999999979, FILETE_AL_VIO_R))
        make_face()
    filete_al_vio_piece_4 = revolve(axis=Axis((41.50000000000003, 41.500000000000036, 20.000000000000004), (0, 0, 1)), revolution_arc=90.00000000000016, mode=Mode.PRIVATE)
    filete_al_vio_piece_4 = filete_al_vio_piece_4 & Plane(origin=(0, 0, 21.71446867019617), x_dir=(1, 1.1e-16, 0), z_dir=(0, 0, 1)) * Cylinder(77, 88, mode=Mode.PRIVATE)
    add(filete_al_vio_piece_4)
    with BuildSketch(Plane(origin=(-41.499999999999986, 41.500000000000014, -20), x_dir=(-4.4e-16, 1, 0), z_dir=(1, 4.4e-16, 0))) as filete_al_vio_piece_5_section:
        with BuildLine():
            CenterArc((16 + FILETE_AL_VIO_R, -FILETE_AL_VIO_R), FILETE_AL_VIO_R, 90, 90)
            Line((16, -FILETE_AL_VIO_R), (16, 0))
            Line((16, 0), (16 + FILETE_AL_VIO_R, 0))
        make_face()
    filete_al_vio_piece_5 = revolve(axis=Axis((-41.499999999999986, 41.500000000000014, -20), (0, 0, 1)), revolution_arc=89.99999999999997, mode=Mode.PRIVATE)
    filete_al_vio_piece_5 = filete_al_vio_piece_5 & Plane(origin=(0, 0, -21.714468670219873), x_dir=(1, 1.1e-16, 0), z_dir=(0, 0, 1)) * Cylinder(77, 88, mode=Mode.PRIVATE)
    add(filete_al_vio_piece_5)
    with BuildSketch(Plane(origin=(41.50000000000003, 41.500000000000036, -20), x_dir=(1, -1.33e-15, 0), z_dir=(-1.33e-15, -1, 0))) as filete_al_vio_piece_6_section:
        with BuildLine():
            CenterArc((15.999999999999979 + FILETE_AL_VIO_R, -FILETE_AL_VIO_R), FILETE_AL_VIO_R, 90, 90)
            Line((15.999999999999979, -FILETE_AL_VIO_R), (15.999999999999979, 0))
            Line((15.999999999999979, 0), (15.999999999999979 + FILETE_AL_VIO_R, 0))
        make_face()
    filete_al_vio_piece_6 = revolve(axis=Axis((41.50000000000003, 41.500000000000036, -20), (0, 0, 1)), revolution_arc=90.00000000000016, mode=Mode.PRIVATE)
    filete_al_vio_piece_6 = filete_al_vio_piece_6 & Plane(origin=(0, 0, -21.714468670219873), x_dir=(1, 1.1e-16, 0), z_dir=(0, 0, 1)) * Cylinder(77, 88, mode=Mode.PRIVATE)
    add(filete_al_vio_piece_6)
    with BuildSketch(Plane(origin=(-41.499999999999986, -41.5, -20), x_dir=(-1, 0, 0), z_dir=(0, 1, 0))) as filete_al_vio_piece_7_section:
        with BuildLine():
            CenterArc((16 + FILETE_AL_VIO_R, -FILETE_AL_VIO_R), FILETE_AL_VIO_R, 90, 90)
            Line((16 + FILETE_AL_VIO_R, 0), (16, 0))
            Line((16, 0), (16, -FILETE_AL_VIO_R))
        make_face()
    filete_al_vio_piece_7 = revolve(axis=Axis((-41.499999999999986, -41.5, -20), (0, 0, 1)), revolution_arc=89.99999999999997, mode=Mode.PRIVATE)
    filete_al_vio_piece_7 = filete_al_vio_piece_7 & Plane(origin=(0, 0, -21.714468670196162), x_dir=(1, 1.1e-16, 0), z_dir=(0, 0, 1)) * Cylinder(77, 88, mode=Mode.PRIVATE)
    add(filete_al_vio_piece_7)
    with BuildSketch(Plane(origin=(41.5, -41.50000000000001, 20.000000000000004), x_dir=(4.4e-16, -1, 0), z_dir=(-1, -4.4e-16, 0))) as filete_al_vio_piece_8_section:
        with BuildLine():
            CenterArc((16 + FILETE_AL_VIO_R, FILETE_AL_VIO_R), FILETE_AL_VIO_R, 180, 90)
            Line((16 + FILETE_AL_VIO_R, 0), (16, 0))
            Line((16, 0), (16, FILETE_AL_VIO_R))
        make_face()
    filete_al_vio_piece_8 = revolve(axis=Axis((41.5, -41.50000000000001, 20.000000000000004), (0, 0, 1)), revolution_arc=90, mode=Mode.PRIVATE)
    filete_al_vio_piece_8 = filete_al_vio_piece_8 & Plane(origin=(0, 0, 21.714468670196165), x_dir=(1, 1.1e-16, 0), z_dir=(0, 0, 1)) * Cylinder(77, 88, mode=Mode.PRIVATE)
    add(filete_al_vio_piece_8)
    with BuildSketch(Plane(origin=(-41.49999999999999, -57.5, 20.000000000000004), x_dir=(0, 0, 1), z_dir=(1, 0, 0)), Plane(origin=(41.50000000000001, 57.500000000000014, 20.000000000000004), x_dir=(0, 0, 1), z_dir=(-1, 0, 0))) as filete_al_vio_piece_9:
        with BuildLine():
            CenterArc((FILETE_AL_VIO_R, FILETE_AL_VIO_R), FILETE_AL_VIO_R, 180, 90)
            Line((0, FILETE_AL_VIO_R), (0, 0))
            Line((0, 0), (FILETE_AL_VIO_R, 0))
        make_face()
    extrude(amount=83)
    with BuildSketch(Plane(origin=(41.5, -57.5, -20), x_dir=(0, -1, 0), z_dir=(-1, 0, 0)), Plane(origin=(-41.5, 57.500000000000014, -20), x_dir=(0, 1, 0), z_dir=(1, 0, 0))) as filete_al_vio_piece_10:
        with BuildLine():
            CenterArc((FILETE_AL_VIO_R, -FILETE_AL_VIO_R), FILETE_AL_VIO_R, 90, 90)
            Line((0, -FILETE_AL_VIO_R), (0, 0))
            Line((0, 0), (FILETE_AL_VIO_R, 0))
        make_face()
    extrude(amount=83)
    with BuildSketch(Plane(origin=(41.5, -41.50000000000001, -20), x_dir=(4.4e-16, -1, 0), z_dir=(-1, -4.4e-16, 0))) as filete_al_vio_piece_11_section:
        with BuildLine():
            CenterArc((16 + FILETE_AL_VIO_R, -FILETE_AL_VIO_R), FILETE_AL_VIO_R, 90, 90)
            Line((16, -FILETE_AL_VIO_R), (16, 0))
            Line((16, 0), (16 + FILETE_AL_VIO_R, 0))
        make_face()
    filete_al_vio_piece_11 = revolve(axis=Axis((41.5, -41.50000000000001, -20), (0, 0, 1)), revolution_arc=90, mode=Mode.PRIVATE)
    filete_al_vio_piece_11 = filete_al_vio_piece_11 & Plane(origin=(0, 0, -21.714468670219873), x_dir=(1, 1.1e-16, 0), z_dir=(0, 0, 1)) * Cylinder(77, 88, mode=Mode.PRIVATE)
    add(filete_al_vio_piece_11)
    with BuildSketch(Plane(origin=(57.50000000000001, 41.500000000000014, -20), x_dir=(1, -9e-17, 0), z_dir=(-9e-17, -1, 0))) as filete_al_vio_piece_12:
        with BuildLine():
            CenterArc((FILETE_AL_VIO_R, -FILETE_AL_VIO_R), FILETE_AL_VIO_R, 90, 90)
            Line((0, -FILETE_AL_VIO_R), (0, 0))
            Line((0, 0), (FILETE_AL_VIO_R, 0))
        make_face()
    extrude(amount=83.00000000000001)

    # Filete4
    filete4_edges = [part.edges().sort_by_distance(p)[0] for p in [
        (42.5, -1.041e-14, -33.5),
        (42.5, -1.041e-14, 33.5),
    ]]
    fillet(filete4_edges, radius=FILETE4_R)


solid = part.part
